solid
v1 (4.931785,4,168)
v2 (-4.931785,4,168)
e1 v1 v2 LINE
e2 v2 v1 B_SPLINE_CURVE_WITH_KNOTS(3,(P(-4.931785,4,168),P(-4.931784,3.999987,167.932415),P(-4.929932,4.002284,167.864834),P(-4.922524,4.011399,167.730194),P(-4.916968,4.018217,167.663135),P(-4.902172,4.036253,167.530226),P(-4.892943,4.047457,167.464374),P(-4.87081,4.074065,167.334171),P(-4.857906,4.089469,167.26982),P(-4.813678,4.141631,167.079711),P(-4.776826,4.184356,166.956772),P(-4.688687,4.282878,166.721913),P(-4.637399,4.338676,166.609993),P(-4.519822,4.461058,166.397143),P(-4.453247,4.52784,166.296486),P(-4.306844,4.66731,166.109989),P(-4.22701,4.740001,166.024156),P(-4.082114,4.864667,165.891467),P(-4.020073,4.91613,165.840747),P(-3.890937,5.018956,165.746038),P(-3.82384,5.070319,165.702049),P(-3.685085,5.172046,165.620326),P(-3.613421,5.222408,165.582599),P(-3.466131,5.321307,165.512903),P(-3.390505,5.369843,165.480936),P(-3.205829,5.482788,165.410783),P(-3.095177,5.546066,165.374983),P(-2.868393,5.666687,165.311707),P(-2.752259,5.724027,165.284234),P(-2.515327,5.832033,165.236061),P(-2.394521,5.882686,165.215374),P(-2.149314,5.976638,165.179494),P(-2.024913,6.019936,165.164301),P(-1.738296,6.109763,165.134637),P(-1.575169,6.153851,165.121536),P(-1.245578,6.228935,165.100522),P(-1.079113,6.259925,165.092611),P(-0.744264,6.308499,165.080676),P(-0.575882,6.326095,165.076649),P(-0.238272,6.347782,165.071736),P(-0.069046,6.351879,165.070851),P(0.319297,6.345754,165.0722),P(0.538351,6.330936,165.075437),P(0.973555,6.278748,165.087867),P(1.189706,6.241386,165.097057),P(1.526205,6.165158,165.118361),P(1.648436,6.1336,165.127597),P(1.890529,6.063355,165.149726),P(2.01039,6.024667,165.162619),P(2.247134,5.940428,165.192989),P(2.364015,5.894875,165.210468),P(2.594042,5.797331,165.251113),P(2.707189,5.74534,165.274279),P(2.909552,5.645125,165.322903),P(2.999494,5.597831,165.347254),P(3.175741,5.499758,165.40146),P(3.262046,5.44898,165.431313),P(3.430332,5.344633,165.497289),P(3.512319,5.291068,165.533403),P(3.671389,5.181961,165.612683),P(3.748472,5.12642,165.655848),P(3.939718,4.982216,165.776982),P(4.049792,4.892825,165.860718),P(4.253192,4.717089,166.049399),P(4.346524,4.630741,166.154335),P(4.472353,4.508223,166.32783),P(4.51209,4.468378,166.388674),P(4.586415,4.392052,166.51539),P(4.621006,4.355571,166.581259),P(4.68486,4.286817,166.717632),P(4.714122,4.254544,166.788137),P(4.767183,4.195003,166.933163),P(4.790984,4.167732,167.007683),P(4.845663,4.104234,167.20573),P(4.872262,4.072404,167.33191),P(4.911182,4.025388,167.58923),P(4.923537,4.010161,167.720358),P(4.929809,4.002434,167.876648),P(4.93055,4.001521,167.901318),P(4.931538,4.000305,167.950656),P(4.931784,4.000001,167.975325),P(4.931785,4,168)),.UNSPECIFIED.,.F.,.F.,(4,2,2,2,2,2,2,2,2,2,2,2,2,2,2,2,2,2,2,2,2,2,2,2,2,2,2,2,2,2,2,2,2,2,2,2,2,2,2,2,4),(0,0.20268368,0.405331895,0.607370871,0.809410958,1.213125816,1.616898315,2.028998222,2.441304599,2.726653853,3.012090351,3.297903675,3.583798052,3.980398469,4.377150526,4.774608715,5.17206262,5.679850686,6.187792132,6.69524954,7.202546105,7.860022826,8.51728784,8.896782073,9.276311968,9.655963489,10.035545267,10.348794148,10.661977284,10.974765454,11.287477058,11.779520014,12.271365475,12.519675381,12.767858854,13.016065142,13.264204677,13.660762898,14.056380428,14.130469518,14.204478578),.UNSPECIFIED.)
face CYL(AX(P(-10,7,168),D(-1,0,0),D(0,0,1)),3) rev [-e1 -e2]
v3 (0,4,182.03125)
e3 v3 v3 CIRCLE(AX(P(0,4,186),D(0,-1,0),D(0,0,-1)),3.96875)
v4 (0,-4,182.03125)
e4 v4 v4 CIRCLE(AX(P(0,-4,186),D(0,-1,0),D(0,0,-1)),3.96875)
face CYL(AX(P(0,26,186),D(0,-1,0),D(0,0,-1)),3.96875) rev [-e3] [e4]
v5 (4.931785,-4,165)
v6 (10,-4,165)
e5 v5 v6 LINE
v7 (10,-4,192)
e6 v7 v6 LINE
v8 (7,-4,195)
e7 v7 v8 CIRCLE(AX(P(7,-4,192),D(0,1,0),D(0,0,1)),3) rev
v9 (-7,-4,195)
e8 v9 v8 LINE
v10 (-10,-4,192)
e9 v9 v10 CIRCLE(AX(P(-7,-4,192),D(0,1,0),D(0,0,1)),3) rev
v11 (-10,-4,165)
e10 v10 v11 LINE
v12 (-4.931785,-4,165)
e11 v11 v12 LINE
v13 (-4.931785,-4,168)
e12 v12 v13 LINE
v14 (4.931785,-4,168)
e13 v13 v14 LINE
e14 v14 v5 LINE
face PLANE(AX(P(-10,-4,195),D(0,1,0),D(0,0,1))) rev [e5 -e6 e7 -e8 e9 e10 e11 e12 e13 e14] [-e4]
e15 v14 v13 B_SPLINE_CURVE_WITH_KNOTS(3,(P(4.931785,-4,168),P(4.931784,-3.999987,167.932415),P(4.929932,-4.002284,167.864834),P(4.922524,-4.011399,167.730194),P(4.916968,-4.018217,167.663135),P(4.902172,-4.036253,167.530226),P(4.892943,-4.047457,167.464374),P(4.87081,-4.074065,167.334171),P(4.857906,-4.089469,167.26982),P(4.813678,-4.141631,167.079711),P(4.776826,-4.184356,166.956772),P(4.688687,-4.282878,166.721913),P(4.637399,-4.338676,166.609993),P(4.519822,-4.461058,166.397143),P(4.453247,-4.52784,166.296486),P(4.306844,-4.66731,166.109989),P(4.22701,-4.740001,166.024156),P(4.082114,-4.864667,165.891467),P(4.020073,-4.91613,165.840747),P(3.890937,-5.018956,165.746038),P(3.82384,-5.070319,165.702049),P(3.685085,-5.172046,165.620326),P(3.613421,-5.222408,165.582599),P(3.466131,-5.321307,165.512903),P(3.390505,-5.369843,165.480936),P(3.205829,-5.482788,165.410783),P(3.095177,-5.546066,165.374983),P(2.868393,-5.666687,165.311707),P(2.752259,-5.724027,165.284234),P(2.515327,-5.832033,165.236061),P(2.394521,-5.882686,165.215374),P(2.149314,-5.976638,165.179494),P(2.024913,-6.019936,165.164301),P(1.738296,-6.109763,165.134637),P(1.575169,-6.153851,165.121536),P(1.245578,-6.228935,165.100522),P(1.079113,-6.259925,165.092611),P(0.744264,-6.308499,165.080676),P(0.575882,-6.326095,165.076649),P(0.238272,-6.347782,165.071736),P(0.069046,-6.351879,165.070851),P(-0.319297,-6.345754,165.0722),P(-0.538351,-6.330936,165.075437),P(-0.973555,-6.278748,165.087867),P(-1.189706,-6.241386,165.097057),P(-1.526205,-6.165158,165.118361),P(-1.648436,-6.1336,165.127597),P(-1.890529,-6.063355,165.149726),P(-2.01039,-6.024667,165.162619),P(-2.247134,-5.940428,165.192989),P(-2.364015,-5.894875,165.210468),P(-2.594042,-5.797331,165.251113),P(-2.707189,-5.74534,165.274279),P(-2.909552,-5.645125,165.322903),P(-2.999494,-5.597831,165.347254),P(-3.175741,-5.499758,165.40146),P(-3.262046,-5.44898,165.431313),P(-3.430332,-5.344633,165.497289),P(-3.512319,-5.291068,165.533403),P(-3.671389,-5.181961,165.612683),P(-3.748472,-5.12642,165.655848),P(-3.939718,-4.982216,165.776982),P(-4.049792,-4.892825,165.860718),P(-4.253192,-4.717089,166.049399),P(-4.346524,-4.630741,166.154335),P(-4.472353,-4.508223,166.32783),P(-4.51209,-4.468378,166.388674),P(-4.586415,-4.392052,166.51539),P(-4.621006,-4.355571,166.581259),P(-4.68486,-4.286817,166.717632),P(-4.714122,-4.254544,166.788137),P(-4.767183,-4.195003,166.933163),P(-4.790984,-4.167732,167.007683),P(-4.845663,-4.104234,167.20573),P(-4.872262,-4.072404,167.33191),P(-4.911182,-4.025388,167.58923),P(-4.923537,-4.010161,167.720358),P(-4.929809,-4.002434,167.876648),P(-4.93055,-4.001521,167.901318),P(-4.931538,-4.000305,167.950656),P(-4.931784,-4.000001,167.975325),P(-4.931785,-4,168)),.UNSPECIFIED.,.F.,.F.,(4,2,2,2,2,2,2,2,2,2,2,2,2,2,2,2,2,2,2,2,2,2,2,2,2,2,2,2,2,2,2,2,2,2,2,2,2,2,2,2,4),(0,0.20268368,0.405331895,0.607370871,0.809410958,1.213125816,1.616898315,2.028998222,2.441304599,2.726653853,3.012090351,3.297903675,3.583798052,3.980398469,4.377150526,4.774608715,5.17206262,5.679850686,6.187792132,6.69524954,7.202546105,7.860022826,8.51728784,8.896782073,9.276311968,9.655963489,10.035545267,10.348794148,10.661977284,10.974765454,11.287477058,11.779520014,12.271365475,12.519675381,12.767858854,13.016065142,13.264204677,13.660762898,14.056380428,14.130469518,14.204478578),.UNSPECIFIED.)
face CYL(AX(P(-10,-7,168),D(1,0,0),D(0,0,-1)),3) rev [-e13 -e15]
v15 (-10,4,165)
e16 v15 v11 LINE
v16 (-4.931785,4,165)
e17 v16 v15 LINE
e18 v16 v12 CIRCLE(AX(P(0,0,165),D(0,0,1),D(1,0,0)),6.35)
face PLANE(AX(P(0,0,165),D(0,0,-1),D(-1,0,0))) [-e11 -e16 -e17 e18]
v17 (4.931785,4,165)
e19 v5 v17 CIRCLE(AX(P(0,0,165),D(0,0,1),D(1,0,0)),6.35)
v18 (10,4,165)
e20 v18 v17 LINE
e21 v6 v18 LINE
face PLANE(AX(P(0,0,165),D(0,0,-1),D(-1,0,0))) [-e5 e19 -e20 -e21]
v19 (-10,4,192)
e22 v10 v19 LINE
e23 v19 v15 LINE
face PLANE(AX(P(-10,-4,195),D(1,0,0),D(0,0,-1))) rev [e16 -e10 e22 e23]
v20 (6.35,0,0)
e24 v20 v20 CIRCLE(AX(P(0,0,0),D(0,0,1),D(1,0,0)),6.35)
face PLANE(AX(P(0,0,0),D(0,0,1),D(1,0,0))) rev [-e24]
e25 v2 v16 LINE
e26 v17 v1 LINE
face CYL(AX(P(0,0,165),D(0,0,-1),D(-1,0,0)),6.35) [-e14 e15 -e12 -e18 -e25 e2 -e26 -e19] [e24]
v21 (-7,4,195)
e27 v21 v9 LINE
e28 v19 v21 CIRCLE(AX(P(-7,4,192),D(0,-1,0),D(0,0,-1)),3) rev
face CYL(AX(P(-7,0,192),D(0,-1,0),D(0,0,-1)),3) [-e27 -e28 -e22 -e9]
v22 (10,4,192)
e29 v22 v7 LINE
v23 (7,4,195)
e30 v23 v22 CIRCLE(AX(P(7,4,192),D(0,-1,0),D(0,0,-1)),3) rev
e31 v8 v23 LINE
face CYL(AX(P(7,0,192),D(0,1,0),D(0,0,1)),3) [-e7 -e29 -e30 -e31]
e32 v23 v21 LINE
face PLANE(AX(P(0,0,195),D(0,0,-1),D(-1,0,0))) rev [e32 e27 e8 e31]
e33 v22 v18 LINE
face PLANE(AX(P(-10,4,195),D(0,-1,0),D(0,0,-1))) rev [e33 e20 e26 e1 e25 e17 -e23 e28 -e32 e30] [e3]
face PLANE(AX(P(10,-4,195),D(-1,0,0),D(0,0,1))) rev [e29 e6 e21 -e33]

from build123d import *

# Parameters (mm, degrees)
CROQUIS1_R              = 6.35
SALIENTE_EXTRUIR1_DEPTH = 165
CROQUIS2_W              = 20
CROQUIS2_H              = 8
SALIENTE_EXTRUIR2_DEPTH = 30
REDONDEO1_R             = 3
REDONDEO2_R             = 3
CROQUIS3_R              = 3.96875
CORTAR_EXTRUIR1_DEPTH   = 30
REDONDEO3_R             = 3


with BuildPart() as part:
    # Croquis1 → Saliente-Extruir1 (new body)
    with BuildSketch(Plane.XY):
        Circle(CROQUIS1_R)
    extrude(amount=SALIENTE_EXTRUIR1_DEPTH)

    # Croquis2 → Saliente-Extruir2 (add)
    with BuildSketch(Plane.XY.offset(165)):
        Rectangle(CROQUIS2_W, CROQUIS2_H)
    extrude(amount=SALIENTE_EXTRUIR2_DEPTH)

    # Redondeo1
    # the kernel refuses this fillet: 3 mm, written as the material it adds along each edge
    with BuildSketch(Plane(origin=(12.431784667, 4, 165), x_dir=(0, 1, 0), z_dir=(-1, 0, 0))) as redondeo1_piece_1_section:
        with BuildLine():
            CenterArc((REDONDEO1_R, -REDONDEO1_R), REDONDEO1_R, 90, 90)
            Line((0, -REDONDEO1_R), (0, 0))
            Line((0, 0), (REDONDEO1_R, 0))
        make_face()
    redondeo1_piece_1 = extrude(amount=24.863569334, mode=Mode.PRIVATE)
    redondeo1_piece_1 = redondeo1_piece_1 & Plane(origin=(0, 0, 165.727834691), x_dir=(1, 0, 0), z_dir=(0, 0, -1)) * Cylinder(6.35, 62, mode=Mode.PRIVATE)
    add(redondeo1_piece_1)

    # Redondeo2
    # the kernel refuses this fillet: 3 mm, written as the material it adds along each edge
    with BuildSketch(Plane(origin=(-12.431784667, -4, 165), x_dir=(0, 0, 1), z_dir=(1, 0, 0))) as redondeo2_piece_1_section:
        with BuildLine():
            CenterArc((REDONDEO2_R, REDONDEO2_R), REDONDEO2_R, 180, 90)
            Line((0, REDONDEO2_R), (0, 0))
            Line((0, 0), (REDONDEO2_R, 0))
        make_face()
    redondeo2_piece_1 = extrude(amount=24.863569334, mode=Mode.PRIVATE)
    redondeo2_piece_1 = redondeo2_piece_1 & Plane(origin=(0, 0, 165.727832958), x_dir=(1, 0, 0), z_dir=(0, 0, -1)) * Cylinder(6.35, 62, mode=Mode.PRIVATE)
    add(redondeo2_piece_1)

    # Croquis3 → Cortar-Extruir1 (cut)
    with BuildSketch(Plane.XZ.offset(4)):
        with Locations(Location((0, 186, 0), (0, 0, 270))):
            Circle(CROQUIS3_R)
    extrude(amount=-CORTAR_EXTRUIR1_DEPTH, mode=Mode.SUBTRACT)

    # Redondeo3
    redondeo3_edges = [part.edges().sort_by_distance(p)[0] for p in [
        (10, 0, 195),
        (-10, 0, 195),
    ]]
    fillet(redondeo3_edges, radius=REDONDEO3_R)


solid = part.part
